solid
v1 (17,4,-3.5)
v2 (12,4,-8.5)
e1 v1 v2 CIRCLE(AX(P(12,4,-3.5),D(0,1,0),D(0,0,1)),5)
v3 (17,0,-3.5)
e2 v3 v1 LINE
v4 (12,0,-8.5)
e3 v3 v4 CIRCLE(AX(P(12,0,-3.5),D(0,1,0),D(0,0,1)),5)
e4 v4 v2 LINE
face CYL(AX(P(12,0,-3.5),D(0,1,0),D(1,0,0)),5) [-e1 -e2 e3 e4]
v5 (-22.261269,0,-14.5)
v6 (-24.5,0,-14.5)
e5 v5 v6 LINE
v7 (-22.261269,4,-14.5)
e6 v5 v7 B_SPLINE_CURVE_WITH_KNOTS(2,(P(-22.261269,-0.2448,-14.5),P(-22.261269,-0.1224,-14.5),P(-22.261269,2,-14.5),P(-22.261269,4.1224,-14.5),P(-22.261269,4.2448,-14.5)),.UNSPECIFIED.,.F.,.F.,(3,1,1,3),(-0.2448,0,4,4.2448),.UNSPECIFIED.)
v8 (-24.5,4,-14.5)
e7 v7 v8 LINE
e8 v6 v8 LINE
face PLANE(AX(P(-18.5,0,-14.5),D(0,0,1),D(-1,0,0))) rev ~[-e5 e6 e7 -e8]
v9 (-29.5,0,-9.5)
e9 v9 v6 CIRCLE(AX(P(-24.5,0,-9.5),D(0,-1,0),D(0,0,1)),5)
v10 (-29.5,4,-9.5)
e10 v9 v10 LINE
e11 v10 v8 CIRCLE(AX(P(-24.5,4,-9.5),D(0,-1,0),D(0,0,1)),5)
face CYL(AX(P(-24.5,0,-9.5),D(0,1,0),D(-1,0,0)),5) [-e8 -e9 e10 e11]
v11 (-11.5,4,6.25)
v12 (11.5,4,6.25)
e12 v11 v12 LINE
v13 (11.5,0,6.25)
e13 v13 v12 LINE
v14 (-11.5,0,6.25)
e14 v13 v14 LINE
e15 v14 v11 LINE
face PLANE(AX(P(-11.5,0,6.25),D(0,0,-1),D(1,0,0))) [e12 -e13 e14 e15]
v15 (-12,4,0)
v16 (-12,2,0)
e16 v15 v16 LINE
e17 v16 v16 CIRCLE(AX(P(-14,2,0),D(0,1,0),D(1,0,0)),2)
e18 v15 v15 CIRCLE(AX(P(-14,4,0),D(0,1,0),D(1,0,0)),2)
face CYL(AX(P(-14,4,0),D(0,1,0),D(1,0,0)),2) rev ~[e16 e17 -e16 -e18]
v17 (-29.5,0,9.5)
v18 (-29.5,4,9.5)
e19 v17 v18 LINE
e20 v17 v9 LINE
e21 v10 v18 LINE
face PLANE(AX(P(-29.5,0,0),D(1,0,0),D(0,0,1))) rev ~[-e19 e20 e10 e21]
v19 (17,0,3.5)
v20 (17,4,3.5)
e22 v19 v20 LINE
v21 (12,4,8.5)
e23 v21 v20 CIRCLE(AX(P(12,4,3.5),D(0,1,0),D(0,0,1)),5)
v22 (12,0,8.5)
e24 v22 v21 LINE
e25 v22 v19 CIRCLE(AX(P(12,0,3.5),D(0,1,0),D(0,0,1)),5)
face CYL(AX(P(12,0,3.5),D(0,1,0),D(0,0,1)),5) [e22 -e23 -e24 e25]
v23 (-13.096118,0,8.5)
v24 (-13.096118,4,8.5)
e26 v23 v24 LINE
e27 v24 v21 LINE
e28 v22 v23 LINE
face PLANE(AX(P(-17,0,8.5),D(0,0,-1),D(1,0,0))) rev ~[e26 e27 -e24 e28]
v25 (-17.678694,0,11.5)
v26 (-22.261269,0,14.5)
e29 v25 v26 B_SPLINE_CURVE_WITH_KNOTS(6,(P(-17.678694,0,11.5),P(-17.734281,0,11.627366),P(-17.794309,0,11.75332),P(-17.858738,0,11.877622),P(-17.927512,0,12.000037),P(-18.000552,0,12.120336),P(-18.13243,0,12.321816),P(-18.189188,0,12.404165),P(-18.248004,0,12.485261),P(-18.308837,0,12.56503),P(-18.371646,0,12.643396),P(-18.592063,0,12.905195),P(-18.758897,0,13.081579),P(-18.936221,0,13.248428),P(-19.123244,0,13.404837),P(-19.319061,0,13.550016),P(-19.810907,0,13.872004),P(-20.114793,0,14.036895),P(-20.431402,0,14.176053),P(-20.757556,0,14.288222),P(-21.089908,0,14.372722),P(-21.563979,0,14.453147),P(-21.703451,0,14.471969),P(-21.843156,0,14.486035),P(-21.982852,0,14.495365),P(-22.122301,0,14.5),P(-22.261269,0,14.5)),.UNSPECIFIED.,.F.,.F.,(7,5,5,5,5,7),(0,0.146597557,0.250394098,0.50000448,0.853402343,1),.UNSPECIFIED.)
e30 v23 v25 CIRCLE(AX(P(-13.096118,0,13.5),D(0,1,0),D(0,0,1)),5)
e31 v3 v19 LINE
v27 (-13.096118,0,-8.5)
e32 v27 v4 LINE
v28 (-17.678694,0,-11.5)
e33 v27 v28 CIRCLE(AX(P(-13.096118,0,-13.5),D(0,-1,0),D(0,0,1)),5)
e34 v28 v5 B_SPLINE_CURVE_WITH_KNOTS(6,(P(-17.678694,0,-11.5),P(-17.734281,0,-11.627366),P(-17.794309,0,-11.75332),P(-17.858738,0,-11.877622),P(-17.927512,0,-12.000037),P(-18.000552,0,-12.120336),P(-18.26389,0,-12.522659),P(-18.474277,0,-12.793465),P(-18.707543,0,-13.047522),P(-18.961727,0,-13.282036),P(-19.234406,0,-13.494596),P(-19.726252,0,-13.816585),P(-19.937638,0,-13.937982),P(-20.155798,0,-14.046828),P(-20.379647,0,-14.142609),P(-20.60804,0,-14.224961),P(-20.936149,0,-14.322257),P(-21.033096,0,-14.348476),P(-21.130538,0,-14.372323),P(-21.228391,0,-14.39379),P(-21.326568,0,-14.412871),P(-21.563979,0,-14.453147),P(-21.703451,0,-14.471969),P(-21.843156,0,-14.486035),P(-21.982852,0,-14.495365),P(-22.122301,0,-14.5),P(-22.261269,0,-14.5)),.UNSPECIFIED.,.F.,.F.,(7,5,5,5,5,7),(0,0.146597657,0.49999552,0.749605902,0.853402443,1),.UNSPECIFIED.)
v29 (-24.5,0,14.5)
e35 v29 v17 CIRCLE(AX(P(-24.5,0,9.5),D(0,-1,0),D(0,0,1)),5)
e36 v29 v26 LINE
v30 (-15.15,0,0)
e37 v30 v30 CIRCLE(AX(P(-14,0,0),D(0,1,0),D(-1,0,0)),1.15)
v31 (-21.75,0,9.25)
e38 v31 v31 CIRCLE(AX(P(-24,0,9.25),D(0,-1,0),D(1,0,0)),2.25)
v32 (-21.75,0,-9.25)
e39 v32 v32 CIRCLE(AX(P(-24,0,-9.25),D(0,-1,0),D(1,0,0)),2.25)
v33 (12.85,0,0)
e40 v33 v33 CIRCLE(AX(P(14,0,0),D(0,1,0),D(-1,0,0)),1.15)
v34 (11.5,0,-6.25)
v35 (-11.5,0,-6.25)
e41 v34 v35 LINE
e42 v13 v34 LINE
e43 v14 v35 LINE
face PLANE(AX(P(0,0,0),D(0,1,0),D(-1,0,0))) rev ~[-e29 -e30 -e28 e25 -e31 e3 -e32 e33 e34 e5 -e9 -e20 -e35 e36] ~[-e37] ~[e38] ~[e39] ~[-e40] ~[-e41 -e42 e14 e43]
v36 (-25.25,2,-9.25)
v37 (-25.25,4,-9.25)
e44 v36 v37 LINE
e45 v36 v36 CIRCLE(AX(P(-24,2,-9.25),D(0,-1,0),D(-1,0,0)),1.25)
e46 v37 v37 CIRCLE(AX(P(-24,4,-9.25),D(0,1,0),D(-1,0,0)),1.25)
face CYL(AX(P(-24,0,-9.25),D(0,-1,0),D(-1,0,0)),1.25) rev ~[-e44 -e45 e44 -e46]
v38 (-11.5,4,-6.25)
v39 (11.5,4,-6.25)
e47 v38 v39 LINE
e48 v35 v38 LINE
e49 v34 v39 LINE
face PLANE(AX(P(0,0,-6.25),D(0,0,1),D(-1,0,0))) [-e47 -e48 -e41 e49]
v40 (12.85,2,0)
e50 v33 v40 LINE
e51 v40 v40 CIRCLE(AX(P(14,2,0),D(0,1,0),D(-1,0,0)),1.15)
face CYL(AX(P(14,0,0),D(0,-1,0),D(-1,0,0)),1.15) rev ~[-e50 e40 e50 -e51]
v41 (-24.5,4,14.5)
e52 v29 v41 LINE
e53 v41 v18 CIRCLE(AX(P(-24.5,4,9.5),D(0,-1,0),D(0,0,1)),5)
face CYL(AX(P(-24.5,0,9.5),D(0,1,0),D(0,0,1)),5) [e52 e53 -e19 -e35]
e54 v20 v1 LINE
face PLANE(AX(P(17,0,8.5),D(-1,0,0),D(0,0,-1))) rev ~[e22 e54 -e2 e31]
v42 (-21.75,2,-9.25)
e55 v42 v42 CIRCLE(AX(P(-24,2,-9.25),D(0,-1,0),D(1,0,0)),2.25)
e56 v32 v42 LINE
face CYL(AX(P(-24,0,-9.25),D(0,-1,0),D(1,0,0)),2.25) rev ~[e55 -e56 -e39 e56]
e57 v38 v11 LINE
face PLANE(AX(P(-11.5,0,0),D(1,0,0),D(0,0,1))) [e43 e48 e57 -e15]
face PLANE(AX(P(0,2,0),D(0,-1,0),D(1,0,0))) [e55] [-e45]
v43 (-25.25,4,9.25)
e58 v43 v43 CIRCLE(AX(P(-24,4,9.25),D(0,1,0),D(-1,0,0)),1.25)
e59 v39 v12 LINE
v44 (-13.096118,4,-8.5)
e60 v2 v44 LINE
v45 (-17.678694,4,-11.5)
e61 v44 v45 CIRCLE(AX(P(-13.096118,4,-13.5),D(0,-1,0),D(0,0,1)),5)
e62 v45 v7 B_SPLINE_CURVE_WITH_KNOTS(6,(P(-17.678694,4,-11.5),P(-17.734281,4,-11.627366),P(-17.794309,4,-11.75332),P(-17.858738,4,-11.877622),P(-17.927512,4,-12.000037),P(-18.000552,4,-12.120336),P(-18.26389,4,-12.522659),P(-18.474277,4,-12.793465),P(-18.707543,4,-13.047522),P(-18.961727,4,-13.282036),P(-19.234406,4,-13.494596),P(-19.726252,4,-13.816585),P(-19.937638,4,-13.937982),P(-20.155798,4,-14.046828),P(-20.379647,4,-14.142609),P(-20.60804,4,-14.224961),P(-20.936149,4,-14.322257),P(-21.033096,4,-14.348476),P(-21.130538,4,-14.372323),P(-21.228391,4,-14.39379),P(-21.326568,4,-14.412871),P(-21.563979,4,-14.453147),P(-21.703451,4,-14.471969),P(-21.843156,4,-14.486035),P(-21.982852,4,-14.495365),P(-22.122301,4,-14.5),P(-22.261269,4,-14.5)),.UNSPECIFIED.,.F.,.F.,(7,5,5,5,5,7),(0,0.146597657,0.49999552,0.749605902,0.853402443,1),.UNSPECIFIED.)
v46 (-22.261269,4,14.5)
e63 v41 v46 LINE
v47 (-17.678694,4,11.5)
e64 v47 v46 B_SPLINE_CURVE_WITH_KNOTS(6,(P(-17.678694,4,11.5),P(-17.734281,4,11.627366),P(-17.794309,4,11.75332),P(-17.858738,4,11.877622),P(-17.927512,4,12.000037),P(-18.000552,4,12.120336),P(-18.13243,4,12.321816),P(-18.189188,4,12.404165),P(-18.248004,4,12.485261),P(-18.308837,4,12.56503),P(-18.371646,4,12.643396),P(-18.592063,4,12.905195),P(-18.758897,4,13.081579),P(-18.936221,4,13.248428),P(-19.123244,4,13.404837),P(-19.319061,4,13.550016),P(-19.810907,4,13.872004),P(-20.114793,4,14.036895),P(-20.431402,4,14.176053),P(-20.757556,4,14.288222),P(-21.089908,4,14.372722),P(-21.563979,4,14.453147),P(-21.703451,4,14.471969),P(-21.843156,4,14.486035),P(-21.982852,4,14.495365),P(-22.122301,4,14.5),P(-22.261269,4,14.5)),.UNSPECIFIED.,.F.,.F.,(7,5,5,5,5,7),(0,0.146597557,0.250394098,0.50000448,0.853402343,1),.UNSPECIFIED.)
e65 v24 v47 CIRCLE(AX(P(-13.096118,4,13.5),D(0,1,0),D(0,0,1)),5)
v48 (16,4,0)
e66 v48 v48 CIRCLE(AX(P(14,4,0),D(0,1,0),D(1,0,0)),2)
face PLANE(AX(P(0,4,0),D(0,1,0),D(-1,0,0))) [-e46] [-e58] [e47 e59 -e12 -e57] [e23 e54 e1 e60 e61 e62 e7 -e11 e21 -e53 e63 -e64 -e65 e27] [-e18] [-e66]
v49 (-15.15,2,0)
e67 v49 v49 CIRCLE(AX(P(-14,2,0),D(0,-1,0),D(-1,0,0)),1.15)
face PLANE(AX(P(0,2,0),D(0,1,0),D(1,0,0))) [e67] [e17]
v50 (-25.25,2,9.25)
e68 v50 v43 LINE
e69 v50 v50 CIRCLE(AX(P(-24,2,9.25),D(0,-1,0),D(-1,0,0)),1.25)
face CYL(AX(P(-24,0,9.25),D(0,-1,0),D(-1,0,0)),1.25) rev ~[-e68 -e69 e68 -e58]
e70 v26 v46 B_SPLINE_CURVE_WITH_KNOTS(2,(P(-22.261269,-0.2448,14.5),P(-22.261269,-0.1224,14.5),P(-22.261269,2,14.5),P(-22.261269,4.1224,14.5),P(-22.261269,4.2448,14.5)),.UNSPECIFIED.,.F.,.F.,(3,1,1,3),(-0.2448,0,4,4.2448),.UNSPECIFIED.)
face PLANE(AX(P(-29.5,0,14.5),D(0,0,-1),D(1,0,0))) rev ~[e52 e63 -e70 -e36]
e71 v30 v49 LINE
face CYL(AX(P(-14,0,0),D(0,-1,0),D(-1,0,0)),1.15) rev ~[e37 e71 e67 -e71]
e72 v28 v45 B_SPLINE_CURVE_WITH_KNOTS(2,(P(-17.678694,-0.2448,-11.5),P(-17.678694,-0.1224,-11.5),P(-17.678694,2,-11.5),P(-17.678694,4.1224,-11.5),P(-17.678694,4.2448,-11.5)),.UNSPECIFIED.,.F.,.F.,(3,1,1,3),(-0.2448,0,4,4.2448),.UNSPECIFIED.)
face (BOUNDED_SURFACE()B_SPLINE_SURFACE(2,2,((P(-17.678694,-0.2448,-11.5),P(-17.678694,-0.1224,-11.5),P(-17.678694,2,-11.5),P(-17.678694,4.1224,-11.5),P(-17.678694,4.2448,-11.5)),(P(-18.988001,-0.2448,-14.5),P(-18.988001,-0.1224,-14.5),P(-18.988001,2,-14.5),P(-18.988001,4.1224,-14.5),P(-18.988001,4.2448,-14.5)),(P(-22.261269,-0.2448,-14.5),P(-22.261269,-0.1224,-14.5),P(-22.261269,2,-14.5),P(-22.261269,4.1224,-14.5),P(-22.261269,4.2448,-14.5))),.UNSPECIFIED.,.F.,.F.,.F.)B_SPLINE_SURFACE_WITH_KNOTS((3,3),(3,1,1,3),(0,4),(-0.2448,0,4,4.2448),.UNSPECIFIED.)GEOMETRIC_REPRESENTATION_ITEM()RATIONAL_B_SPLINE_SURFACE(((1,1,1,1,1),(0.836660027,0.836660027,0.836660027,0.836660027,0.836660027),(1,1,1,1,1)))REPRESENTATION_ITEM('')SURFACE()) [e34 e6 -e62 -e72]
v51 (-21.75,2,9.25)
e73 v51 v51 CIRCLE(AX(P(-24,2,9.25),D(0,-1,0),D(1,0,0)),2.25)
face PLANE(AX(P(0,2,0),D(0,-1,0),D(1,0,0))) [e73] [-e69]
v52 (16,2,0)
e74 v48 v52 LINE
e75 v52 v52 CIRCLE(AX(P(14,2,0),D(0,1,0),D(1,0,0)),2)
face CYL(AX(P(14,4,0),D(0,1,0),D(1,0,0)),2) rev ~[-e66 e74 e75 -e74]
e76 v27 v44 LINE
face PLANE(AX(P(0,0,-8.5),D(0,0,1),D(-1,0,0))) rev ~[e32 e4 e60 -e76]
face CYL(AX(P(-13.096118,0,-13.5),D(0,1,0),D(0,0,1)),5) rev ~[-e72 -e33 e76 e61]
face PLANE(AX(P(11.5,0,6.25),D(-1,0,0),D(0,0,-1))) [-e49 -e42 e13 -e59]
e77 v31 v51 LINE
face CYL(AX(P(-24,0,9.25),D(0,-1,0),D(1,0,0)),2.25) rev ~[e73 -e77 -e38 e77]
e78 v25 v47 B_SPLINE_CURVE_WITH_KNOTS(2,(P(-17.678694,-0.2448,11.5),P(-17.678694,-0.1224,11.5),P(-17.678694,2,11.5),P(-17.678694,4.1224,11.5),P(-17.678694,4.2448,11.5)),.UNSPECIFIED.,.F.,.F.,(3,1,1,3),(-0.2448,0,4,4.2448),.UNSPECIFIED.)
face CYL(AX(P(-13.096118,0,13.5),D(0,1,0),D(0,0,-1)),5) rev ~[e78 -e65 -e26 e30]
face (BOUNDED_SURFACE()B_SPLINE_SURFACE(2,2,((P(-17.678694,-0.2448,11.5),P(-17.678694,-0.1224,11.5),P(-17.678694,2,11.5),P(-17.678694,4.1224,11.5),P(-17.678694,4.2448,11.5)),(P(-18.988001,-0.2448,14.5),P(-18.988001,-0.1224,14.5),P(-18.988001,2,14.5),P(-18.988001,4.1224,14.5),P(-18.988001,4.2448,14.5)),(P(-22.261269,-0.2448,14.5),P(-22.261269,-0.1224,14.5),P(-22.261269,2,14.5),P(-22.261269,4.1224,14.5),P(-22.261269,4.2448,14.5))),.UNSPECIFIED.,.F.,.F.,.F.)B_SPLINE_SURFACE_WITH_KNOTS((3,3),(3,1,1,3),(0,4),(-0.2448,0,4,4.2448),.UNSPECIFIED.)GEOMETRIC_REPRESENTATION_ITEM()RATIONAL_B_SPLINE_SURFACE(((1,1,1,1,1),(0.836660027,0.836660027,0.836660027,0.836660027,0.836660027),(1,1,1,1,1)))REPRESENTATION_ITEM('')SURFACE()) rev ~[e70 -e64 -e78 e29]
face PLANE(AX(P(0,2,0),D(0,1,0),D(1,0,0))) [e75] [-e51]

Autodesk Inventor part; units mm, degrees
ref_plane "YZ Plane" through (0, 0, 0) normal (1, 0, 0) x (0, 1, 0)
ref_plane "XZ Plane" through (0, 0, 0) normal (0, 1, 0) x (-1, 0, 0)
ref_plane "XY Plane" through (0, 0, 0) normal (0, 0, 1) x (1, 0, 0)
sketch "Sketch1" plane through (0, 0, 0) normal (0, 1, 0) x (-1, 0, 0)
  line L0 (11.5, 6.25) -> (-11.5, 6.25)
  line L1 (-11.5, 6.25) -> (-11.5, -6.25)
  line L2 (-11.5, -6.25) -> (11.5, -6.25)
  line L3 (11.5, -6.25) -> (11.5, 6.25)
  line L4 (11.5, 6.25) -> (-11.5, -6.25) construction
  line L5 (-11.5, 6.25) -> (11.5, -6.25) construction
  line L6 (17, 8.5) -> (-17, 8.5)
  line L7 (-17, 8.5) -> (-17, -8.5)
  line L8 (-17, -8.5) -> (17, -8.5)
  line L9 (17, -8.5) -> (17, 8.5) construction
  line L10 (17, 8.5) -> (-17, -8.5) construction
  line L11 (-17, 8.5) -> (17, -8.5) construction
  line L12 (38.8, 0) -> (-26.3, 0) projected
  line L13 (0, -20.3) -> (0, 20.3) projected
  line L14 (29.5, 14.5) -> (18.5, 14.5)
  line L15 (18.5, 14.5) -> (18.5, -14.5) construction
  line L16 (18.5, -14.5) -> (29.5, -14.5)
  line L17 (29.5, -14.5) -> (29.5, 14.5)
  line L18 (29.5, 14.5) -> (18.5, -14.5) construction
  line L19 (18.5, 14.5) -> (29.5, -14.5) construction
  line L20 (18.5, 14.5) -> (17, 8.5)
  line L21 (17, -8.5) -> (18.5, -14.5)
  circle A0 centre (-14, 0) radius 1.15
  circle A1 centre (14, 0) radius 1.15
  circle A2 centre (24, 9.25) radius 1.25
  circle A3 centre (24, -9.25) radius 1.25
  point P0 (0, 0)
  point P1 (24, 0)
  dimension "d0" = 23
  dimension "d1" = 12.5
  dimension "d2" = 17
  dimension "d3" = 34
  dimension "d11" = 2.3
  dimension "d12" = 28
  dimension "d13" = 12.5
  dimension "d14" = 2.5
  dimension "d15" = 9.25
  dimension "d16" = 29
  dimension "d18" = 5.5
extrude "Extrusion1" add sketch "Sketch1" along normal blind 4 contours L0 L13 L6 L20 L14 L17 L12 A1 L3 | L0 L1 L12 A0 L7 L6 L13 | L12 A1 L17 L16 L21 L8 L13 L2 L3 | L1 L2 L13 L8 L7 L12 A0
sketch "Sketch2" plane through (0, 4, 0) normal (0, 1, 0) x (1, 0, 0)
  circle A0 centre (14, 0) radius 1.15 projected
  circle A1 centre (14, 0) radius 2
  line L0 (0, 20.3) -> (0, -20.3) projected
  circle A2 centre (-14, 0) radius 2
  point P0 (0, 0)
  dimension "d21" = 4
extrude "Extrusion2" cut sketch "Sketch2" against normal blind 2
sketch "Sketch3" plane through (0, 0, 0) normal (0, -1, 0) x (1, 0, 0)
  line L0 (-38.8, 0) -> (26.3, 0) projected
  circle A0 centre (-24, 9.25) radius 1.25 projected
  circle A1 centre (-24, 9.25) radius 2.25
  circle A2 centre (-24, -9.25) radius 2.25
  point P0 (0, 0)
  dimension "d24" = 4.5
extrude "Extrusion3" cut sketch "Sketch3" against normal blind 2 contours A0 | A1 | A2
fillet "Fillet1" radius 5 8 edges at (-18.5, 2, 14.5) (-17, 2, 8.5) (-29.5, 2, 14.5) (-29.5, 2, -14.5) (-18.5, 2, -14.5) (-17, 2, -8.5) (17, 2, -8.5) (17, 2, 8.5)
properties part number "mount1"
